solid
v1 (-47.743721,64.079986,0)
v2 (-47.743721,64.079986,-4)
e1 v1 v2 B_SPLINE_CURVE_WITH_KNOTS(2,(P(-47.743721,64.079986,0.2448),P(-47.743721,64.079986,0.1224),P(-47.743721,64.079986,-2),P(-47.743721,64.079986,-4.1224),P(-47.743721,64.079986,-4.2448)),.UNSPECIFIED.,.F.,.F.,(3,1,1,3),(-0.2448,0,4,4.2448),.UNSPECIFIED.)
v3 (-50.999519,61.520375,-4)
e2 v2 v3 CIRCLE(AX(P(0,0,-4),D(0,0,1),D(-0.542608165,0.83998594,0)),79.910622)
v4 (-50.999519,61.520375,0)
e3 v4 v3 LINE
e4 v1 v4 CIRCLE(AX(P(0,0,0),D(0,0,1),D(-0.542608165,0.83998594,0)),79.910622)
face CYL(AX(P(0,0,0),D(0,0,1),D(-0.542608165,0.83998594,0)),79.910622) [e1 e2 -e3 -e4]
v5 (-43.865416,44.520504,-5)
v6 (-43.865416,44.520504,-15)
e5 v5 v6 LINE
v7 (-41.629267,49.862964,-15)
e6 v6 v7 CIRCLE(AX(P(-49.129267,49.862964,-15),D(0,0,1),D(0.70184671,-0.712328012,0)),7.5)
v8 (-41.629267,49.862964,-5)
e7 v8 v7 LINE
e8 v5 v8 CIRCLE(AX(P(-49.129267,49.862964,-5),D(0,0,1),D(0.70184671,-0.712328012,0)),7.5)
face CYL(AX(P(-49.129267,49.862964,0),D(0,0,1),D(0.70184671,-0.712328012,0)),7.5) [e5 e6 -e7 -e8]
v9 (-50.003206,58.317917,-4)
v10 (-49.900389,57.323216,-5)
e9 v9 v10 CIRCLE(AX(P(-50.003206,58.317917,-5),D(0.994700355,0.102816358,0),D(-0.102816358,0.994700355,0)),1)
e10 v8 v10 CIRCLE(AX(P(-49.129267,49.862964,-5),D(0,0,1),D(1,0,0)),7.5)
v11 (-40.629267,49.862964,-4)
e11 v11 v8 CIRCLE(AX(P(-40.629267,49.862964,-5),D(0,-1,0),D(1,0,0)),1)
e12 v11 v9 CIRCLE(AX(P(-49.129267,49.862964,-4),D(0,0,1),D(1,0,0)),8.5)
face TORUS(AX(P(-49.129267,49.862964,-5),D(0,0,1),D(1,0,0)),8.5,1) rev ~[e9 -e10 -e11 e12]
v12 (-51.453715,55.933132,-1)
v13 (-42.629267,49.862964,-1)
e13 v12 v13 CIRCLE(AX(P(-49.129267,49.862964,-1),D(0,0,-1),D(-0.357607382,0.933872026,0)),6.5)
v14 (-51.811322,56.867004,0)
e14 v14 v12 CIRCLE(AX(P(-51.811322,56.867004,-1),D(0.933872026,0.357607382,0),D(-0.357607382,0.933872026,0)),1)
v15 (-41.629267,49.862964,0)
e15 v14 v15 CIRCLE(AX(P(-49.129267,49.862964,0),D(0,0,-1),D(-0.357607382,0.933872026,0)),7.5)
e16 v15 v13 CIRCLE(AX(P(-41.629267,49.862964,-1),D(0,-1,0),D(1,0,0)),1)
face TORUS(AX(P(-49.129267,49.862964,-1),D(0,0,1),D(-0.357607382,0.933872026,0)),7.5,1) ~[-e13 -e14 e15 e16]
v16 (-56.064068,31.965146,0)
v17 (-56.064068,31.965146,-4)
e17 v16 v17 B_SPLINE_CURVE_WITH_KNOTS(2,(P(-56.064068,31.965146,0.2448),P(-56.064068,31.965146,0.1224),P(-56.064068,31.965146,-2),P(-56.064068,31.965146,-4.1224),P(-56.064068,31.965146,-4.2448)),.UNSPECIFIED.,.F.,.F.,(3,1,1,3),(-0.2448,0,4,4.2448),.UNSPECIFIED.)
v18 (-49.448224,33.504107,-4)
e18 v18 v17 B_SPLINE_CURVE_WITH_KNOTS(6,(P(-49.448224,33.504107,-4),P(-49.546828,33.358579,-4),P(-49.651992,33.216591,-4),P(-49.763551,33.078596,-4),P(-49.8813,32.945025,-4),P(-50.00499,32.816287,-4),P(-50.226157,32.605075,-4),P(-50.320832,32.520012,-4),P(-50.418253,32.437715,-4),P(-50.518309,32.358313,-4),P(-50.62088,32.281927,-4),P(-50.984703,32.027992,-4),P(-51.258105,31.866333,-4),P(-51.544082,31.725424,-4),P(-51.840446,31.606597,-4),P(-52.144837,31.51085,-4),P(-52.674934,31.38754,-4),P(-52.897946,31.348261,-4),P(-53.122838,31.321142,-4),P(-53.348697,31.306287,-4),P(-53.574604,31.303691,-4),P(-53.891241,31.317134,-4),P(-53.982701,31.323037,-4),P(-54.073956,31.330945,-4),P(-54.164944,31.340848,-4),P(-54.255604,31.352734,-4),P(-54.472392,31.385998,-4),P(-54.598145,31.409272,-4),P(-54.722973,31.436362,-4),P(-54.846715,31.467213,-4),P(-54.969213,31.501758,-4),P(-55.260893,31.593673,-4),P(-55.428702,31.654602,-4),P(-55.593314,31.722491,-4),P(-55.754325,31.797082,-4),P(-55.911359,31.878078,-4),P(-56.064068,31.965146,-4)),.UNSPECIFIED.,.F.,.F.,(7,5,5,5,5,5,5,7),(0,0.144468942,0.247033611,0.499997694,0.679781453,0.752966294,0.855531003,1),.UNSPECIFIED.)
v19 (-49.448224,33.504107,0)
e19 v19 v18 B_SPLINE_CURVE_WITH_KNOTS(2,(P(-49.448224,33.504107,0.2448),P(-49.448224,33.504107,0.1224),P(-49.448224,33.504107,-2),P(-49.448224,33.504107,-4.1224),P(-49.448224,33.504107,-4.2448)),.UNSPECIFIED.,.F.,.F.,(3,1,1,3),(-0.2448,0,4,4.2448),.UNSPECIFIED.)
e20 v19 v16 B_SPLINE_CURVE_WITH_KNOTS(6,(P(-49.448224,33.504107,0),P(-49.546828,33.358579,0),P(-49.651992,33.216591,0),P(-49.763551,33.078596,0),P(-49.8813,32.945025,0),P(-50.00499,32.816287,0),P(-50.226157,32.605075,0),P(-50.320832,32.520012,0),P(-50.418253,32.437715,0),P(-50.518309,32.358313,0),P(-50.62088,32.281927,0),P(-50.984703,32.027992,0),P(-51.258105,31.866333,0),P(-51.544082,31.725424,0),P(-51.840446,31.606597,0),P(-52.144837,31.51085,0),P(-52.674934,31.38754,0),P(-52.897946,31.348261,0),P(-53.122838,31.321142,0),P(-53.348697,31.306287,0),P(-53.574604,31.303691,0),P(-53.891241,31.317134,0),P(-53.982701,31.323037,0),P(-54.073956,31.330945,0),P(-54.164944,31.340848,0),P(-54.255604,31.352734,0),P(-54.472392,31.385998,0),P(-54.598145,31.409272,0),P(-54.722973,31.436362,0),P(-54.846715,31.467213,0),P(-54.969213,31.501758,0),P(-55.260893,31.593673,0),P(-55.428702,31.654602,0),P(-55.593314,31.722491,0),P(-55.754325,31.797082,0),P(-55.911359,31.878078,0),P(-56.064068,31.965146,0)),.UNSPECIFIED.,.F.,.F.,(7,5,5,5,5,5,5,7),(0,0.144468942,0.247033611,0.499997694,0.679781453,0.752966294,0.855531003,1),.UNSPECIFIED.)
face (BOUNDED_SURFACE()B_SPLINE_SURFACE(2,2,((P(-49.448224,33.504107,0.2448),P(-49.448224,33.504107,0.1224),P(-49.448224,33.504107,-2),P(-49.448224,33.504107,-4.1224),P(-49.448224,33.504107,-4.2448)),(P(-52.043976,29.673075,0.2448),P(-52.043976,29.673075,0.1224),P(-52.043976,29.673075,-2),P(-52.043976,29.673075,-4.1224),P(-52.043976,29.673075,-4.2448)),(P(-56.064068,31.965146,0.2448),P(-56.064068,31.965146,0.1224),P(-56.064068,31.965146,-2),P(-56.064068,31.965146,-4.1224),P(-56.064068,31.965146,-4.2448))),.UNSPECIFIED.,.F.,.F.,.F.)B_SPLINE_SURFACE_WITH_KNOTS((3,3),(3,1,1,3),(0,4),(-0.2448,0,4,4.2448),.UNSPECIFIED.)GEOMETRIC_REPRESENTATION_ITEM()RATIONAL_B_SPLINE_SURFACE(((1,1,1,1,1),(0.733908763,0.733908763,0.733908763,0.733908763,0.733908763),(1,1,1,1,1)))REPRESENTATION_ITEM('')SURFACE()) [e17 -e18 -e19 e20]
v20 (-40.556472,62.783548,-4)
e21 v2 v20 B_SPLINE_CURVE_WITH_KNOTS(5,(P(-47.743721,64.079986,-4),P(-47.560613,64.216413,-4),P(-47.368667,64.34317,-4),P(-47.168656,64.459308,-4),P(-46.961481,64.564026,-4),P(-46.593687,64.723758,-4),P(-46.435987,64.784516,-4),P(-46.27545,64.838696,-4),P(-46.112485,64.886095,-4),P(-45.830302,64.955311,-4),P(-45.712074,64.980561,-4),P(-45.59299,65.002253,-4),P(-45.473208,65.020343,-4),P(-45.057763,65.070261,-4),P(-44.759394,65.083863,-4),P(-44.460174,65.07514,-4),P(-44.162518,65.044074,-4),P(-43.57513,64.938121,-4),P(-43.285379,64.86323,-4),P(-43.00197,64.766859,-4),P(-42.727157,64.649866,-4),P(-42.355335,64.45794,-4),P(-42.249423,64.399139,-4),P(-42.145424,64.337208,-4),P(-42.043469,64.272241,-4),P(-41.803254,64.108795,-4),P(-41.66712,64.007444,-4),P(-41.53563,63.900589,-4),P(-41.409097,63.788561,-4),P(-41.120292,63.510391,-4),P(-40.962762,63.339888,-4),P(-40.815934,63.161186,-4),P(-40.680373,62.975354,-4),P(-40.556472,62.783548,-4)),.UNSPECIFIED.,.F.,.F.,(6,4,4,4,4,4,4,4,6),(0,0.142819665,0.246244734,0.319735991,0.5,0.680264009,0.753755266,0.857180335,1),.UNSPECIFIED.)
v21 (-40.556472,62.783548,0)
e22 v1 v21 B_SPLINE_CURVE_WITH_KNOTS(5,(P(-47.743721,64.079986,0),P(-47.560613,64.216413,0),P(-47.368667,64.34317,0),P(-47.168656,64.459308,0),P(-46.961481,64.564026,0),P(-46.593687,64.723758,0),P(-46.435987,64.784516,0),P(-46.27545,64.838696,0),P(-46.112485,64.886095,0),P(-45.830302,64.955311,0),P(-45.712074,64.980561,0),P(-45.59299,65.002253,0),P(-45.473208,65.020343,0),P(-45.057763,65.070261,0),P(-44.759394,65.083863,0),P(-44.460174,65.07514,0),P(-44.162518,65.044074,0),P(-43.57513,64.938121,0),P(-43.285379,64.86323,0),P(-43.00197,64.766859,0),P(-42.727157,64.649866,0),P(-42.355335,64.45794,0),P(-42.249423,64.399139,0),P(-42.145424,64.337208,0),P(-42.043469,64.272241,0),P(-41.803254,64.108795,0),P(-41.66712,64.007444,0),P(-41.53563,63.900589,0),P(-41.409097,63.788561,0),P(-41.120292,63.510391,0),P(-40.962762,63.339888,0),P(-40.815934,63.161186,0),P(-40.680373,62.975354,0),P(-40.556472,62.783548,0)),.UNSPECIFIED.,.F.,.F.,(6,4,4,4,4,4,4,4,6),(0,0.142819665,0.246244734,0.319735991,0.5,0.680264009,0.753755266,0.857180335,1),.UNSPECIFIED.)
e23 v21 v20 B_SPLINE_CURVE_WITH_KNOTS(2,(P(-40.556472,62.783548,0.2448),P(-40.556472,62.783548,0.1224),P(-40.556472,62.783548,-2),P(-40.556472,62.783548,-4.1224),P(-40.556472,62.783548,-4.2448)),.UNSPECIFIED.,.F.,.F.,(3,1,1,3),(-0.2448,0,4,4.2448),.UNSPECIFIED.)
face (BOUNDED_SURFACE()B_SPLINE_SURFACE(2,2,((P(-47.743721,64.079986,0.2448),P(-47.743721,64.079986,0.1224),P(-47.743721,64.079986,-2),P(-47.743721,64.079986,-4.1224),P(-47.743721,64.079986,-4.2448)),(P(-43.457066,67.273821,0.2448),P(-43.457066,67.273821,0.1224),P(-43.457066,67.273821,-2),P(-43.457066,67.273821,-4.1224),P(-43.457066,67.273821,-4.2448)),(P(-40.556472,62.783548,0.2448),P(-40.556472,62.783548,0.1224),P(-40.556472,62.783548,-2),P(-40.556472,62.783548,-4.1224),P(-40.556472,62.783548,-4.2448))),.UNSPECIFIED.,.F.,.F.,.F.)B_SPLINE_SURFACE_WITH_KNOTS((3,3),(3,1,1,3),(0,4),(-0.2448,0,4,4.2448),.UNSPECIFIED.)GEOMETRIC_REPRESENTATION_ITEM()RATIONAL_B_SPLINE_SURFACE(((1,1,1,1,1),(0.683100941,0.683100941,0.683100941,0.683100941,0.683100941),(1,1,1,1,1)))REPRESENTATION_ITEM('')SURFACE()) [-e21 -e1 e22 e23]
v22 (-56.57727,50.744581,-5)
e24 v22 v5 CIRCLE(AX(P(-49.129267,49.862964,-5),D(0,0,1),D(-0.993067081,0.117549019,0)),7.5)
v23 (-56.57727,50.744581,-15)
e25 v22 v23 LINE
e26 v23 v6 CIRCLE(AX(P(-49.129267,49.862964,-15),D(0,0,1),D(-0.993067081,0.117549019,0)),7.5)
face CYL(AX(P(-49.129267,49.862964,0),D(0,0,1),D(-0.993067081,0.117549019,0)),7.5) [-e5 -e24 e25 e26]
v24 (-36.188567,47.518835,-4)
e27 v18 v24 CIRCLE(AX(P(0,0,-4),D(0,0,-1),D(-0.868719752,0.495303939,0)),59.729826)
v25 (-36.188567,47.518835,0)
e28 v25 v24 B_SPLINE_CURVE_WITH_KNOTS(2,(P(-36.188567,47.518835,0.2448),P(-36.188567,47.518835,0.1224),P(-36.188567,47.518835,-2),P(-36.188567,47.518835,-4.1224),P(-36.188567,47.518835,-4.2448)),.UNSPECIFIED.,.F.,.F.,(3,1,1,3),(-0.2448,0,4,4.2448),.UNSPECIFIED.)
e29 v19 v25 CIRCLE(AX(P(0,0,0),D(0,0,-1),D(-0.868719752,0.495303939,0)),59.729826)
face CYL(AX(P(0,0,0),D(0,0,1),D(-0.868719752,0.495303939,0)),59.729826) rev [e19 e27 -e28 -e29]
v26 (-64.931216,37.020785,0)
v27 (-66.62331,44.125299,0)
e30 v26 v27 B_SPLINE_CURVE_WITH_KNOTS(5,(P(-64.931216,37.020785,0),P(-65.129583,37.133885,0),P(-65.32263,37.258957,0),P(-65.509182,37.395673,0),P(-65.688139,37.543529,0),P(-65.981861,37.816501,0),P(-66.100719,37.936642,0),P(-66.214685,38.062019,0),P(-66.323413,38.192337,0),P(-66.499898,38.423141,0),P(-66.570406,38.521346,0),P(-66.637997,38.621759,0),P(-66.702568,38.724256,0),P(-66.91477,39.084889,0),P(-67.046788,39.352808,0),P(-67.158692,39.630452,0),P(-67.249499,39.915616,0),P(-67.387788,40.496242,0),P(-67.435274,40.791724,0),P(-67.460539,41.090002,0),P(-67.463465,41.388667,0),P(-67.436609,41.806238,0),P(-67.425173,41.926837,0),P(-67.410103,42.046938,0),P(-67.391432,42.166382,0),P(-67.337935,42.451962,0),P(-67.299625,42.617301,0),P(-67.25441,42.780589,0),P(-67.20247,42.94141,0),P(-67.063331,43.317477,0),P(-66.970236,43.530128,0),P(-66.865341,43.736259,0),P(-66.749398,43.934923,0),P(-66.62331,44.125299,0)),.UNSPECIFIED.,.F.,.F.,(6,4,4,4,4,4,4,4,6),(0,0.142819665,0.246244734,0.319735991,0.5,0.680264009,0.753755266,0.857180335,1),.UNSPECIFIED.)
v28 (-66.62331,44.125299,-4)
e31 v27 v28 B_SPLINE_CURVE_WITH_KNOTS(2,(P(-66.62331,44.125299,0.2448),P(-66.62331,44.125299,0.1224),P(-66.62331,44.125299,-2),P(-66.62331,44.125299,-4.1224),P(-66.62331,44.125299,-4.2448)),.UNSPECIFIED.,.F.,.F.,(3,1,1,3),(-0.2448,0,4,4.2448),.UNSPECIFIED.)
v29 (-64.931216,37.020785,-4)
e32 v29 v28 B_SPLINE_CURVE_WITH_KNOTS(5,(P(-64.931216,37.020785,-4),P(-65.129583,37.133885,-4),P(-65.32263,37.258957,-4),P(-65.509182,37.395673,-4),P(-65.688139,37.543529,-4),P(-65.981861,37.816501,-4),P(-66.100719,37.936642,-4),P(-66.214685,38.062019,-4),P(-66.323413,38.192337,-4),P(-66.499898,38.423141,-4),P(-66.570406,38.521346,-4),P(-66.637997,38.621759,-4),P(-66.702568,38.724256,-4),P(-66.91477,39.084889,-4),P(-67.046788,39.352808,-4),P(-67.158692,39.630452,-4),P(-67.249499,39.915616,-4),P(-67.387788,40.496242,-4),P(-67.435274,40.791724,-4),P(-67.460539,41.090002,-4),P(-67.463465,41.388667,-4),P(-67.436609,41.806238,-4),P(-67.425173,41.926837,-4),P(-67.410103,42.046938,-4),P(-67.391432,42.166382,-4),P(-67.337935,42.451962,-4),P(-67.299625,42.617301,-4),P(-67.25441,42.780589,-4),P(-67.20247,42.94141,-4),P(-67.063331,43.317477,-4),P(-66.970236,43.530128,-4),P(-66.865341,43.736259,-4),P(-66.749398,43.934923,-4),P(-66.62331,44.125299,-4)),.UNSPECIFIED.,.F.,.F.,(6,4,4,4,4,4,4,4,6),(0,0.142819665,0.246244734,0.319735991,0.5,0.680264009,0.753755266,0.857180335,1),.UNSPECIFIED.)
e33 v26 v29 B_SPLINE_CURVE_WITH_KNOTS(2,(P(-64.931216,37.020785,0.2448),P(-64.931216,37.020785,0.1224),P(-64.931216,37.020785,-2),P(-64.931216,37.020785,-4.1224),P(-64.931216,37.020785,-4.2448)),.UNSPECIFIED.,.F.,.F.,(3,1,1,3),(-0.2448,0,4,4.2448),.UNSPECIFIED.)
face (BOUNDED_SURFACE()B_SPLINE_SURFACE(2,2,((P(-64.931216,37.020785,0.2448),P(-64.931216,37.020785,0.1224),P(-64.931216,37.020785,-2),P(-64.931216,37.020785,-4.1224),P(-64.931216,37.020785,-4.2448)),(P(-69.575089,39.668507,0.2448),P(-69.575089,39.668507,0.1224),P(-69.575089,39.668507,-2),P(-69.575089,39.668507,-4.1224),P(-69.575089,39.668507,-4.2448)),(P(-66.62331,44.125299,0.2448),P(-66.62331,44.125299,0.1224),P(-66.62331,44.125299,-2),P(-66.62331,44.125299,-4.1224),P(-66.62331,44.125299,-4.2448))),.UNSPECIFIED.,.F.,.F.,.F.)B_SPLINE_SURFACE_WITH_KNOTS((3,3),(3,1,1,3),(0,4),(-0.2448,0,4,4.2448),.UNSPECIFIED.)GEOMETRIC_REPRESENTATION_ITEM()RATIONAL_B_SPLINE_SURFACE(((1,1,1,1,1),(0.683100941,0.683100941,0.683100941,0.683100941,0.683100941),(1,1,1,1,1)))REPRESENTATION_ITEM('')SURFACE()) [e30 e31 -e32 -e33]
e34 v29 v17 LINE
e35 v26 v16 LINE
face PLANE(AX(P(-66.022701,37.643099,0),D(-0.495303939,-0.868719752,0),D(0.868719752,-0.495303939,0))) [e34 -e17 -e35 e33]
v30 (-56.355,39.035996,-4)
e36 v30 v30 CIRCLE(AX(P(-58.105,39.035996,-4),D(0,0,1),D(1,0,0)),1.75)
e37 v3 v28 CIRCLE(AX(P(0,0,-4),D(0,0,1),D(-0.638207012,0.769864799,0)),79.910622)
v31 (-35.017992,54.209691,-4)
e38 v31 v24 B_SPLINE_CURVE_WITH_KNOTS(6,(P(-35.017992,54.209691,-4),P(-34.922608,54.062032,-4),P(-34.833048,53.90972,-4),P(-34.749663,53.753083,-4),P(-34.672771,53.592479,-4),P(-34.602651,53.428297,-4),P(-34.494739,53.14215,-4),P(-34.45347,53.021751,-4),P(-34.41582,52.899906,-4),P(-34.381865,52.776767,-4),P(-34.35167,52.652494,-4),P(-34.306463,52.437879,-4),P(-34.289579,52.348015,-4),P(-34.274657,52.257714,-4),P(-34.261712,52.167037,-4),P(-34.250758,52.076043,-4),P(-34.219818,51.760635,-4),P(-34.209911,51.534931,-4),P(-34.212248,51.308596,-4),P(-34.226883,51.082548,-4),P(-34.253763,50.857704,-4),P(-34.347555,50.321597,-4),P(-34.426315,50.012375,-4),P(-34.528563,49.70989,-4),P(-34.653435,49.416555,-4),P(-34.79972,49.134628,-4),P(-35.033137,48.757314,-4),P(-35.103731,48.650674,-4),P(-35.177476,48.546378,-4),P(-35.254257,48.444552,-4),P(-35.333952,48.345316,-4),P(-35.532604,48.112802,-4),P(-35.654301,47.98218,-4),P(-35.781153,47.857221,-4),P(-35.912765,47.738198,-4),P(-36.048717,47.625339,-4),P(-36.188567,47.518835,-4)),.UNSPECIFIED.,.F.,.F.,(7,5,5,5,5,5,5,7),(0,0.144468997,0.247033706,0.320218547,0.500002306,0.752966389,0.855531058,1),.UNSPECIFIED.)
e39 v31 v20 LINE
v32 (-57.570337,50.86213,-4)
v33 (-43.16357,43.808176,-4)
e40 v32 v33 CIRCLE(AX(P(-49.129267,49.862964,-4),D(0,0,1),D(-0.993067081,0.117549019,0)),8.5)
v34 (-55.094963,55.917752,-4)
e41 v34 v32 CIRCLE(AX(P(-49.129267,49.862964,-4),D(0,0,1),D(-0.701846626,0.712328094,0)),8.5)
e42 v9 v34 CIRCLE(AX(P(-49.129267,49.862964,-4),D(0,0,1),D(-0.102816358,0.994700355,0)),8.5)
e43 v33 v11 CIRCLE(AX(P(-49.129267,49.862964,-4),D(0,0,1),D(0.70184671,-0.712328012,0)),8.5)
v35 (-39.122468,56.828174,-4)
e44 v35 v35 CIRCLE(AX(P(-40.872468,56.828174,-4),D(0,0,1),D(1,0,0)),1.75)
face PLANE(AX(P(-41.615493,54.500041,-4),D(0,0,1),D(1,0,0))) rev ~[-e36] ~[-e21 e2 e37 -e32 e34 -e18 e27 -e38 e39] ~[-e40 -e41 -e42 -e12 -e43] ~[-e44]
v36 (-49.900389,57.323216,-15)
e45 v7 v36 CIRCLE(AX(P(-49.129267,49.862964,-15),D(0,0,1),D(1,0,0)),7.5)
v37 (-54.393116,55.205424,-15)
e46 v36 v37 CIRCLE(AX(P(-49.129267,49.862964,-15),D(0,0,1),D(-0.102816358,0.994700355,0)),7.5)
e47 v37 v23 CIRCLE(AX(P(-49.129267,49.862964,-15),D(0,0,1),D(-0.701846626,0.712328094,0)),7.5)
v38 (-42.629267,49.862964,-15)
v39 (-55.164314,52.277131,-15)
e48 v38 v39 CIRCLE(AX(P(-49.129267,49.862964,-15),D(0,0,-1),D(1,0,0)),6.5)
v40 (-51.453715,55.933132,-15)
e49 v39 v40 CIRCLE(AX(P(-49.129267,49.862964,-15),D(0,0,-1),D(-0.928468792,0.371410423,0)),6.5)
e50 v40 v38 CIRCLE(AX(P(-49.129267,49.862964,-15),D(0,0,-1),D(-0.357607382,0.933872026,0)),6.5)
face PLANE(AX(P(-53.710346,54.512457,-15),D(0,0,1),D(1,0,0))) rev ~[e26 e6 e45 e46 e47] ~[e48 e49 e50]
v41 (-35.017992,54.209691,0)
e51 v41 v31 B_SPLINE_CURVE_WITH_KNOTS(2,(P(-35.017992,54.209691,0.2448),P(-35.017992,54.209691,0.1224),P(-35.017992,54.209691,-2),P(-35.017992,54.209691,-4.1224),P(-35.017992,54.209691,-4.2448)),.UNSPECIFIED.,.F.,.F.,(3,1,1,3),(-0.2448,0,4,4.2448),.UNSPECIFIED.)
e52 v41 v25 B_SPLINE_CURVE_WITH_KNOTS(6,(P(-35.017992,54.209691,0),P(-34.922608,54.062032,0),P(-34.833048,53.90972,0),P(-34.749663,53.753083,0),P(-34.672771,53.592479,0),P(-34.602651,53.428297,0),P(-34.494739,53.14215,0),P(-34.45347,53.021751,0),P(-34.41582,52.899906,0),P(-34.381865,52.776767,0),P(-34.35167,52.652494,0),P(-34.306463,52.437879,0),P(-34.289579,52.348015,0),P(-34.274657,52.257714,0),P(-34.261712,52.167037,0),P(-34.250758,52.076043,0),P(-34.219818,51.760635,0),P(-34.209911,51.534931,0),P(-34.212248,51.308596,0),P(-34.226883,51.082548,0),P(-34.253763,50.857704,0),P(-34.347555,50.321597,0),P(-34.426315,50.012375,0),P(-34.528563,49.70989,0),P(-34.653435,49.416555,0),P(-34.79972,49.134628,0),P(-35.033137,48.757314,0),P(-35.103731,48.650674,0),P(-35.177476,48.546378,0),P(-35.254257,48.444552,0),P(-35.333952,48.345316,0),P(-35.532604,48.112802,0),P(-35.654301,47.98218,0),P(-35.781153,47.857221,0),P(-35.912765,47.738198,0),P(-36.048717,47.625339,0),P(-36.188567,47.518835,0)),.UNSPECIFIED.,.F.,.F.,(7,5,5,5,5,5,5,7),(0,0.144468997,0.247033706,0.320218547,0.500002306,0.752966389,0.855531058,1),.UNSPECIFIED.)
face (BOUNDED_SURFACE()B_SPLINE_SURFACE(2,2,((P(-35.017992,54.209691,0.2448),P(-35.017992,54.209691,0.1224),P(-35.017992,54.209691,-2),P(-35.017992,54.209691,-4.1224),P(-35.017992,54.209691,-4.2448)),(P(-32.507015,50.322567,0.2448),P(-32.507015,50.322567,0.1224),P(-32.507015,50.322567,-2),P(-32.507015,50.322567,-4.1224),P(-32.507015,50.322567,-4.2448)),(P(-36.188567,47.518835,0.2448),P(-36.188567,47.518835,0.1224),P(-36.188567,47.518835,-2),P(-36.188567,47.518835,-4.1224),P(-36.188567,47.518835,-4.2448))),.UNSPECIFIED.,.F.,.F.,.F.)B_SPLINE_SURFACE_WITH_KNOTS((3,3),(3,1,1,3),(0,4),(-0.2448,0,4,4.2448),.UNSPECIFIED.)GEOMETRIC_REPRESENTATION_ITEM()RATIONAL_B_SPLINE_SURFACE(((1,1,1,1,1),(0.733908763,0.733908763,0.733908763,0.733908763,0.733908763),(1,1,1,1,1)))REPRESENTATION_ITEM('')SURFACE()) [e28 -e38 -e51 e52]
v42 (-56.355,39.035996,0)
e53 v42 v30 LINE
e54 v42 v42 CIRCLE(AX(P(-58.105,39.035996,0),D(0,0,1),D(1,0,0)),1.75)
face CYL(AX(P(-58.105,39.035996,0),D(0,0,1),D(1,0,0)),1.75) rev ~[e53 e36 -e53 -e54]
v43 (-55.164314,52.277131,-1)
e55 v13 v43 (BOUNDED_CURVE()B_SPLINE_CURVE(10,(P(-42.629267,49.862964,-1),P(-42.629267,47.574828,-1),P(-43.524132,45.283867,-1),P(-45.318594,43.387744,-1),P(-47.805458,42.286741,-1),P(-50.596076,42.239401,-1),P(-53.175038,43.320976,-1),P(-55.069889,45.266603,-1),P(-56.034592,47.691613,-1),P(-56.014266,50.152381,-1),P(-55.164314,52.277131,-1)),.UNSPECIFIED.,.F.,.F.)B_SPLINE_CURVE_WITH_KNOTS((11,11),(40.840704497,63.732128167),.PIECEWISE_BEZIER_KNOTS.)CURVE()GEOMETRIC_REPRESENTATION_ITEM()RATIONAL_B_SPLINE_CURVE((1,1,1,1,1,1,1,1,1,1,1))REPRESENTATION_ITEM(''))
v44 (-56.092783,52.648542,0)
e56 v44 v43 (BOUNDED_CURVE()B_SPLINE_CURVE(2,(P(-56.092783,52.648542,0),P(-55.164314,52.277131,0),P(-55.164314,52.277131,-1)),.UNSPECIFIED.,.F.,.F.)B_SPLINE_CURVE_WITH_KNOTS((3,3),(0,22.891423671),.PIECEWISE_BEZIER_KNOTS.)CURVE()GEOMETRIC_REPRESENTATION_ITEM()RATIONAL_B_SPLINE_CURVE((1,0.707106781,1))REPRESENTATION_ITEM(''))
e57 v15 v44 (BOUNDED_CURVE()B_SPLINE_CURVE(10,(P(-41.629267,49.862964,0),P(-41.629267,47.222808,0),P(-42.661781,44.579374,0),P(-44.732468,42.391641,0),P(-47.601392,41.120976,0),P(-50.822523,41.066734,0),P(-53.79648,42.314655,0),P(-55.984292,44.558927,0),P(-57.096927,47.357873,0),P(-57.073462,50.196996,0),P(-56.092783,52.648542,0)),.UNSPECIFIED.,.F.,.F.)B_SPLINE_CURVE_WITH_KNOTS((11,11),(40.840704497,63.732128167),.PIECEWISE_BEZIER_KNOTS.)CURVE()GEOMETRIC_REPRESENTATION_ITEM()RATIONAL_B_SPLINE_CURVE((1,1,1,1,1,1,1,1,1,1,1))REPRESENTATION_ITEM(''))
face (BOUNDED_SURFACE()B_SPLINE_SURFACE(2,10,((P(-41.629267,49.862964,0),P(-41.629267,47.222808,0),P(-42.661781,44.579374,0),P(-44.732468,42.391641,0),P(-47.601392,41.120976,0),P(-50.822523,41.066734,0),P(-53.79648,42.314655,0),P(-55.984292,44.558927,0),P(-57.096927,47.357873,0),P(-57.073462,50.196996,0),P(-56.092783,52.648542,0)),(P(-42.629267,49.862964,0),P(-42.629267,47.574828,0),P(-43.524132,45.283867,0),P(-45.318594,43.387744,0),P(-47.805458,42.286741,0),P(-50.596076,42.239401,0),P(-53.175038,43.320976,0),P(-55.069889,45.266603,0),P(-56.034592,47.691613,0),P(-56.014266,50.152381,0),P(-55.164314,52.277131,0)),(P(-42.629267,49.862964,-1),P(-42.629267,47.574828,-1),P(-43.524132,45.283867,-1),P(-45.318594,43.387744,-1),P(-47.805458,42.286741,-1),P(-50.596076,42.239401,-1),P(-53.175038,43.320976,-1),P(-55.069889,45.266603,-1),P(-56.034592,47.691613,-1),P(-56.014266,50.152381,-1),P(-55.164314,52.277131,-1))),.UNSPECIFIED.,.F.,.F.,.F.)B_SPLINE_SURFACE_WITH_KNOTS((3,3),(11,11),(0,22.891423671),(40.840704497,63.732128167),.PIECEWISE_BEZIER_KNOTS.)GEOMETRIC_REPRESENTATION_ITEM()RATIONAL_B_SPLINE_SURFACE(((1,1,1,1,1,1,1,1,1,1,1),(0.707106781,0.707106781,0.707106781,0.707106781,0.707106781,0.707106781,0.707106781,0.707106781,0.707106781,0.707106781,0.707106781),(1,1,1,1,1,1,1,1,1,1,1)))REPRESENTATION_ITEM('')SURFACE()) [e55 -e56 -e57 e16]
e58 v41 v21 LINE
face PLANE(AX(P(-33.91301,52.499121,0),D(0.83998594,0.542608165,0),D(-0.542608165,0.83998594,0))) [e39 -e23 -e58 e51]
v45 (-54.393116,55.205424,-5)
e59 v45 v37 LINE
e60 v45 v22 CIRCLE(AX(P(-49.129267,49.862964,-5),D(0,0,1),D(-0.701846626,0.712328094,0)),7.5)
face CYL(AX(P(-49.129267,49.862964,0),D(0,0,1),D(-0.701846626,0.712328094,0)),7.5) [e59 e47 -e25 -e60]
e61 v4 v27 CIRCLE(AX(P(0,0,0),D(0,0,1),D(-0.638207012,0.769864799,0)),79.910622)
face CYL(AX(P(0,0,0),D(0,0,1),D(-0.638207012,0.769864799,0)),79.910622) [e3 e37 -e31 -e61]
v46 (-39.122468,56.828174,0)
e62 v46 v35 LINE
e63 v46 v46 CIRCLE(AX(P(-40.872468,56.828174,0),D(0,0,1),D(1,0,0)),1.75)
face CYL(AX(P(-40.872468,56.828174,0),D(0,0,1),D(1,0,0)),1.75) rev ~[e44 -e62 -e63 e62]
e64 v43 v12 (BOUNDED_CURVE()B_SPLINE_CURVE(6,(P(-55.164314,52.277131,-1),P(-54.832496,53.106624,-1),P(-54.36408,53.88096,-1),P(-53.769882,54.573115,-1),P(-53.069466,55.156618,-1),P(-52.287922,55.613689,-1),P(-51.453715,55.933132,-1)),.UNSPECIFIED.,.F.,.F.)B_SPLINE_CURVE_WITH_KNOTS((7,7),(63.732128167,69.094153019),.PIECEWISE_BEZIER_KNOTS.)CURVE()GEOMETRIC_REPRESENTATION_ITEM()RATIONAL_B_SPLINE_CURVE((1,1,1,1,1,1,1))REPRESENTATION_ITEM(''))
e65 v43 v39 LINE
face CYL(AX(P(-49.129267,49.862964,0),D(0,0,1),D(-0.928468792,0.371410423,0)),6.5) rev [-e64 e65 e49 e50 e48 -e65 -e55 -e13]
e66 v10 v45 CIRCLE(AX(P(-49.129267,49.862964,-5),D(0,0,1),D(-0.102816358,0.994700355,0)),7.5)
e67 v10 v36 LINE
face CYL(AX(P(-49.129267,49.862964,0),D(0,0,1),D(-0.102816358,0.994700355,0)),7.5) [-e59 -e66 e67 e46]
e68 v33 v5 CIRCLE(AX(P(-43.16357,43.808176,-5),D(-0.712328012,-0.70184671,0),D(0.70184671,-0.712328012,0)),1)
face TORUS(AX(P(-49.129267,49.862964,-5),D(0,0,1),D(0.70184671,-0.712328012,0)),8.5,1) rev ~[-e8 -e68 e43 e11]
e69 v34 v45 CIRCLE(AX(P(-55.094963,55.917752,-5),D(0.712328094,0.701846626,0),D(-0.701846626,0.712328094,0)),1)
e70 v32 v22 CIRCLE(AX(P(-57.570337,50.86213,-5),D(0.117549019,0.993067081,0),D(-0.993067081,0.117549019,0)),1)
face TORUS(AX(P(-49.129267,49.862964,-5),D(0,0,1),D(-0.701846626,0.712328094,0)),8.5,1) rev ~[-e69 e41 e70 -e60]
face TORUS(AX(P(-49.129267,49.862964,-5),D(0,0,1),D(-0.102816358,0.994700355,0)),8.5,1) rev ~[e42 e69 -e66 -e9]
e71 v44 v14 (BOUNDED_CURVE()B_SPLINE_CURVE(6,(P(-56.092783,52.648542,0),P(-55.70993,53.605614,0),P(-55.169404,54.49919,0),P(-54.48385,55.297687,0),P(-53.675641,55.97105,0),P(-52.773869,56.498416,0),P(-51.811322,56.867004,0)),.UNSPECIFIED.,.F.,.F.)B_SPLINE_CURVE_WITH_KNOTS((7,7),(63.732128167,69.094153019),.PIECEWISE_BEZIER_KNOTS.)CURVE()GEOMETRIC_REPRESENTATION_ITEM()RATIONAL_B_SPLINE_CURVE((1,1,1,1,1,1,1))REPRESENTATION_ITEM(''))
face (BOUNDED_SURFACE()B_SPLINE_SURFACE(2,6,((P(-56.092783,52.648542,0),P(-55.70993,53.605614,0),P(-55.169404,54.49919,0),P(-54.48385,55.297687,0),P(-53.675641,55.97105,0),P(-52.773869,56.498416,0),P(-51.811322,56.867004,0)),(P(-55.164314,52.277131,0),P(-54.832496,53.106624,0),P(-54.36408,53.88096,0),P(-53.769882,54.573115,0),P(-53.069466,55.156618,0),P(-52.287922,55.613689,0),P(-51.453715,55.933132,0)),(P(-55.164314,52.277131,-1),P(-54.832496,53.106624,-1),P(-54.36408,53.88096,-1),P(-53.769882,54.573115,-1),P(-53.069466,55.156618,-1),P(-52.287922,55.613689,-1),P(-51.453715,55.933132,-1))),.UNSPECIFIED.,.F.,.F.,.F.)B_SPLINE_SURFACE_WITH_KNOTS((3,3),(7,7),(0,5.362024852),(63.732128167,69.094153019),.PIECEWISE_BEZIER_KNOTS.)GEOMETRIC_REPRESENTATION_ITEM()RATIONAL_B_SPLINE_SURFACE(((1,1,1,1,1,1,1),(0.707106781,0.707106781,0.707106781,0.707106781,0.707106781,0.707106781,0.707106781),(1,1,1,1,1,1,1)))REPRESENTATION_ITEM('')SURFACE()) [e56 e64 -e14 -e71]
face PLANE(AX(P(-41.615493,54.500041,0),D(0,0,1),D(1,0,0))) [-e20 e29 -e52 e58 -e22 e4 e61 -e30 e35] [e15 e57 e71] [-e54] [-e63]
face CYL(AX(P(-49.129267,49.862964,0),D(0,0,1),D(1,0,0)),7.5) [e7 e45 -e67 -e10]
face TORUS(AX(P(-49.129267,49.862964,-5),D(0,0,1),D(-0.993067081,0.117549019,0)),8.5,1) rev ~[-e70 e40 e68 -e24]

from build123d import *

# Parameters (mm, degrees)
F0_R     = 1.75
F1_DEPTH = 4
F2_DEPTH = 15
F3_R     = 5
F4_R     = 1


# Not quite as in the source:
# - a feature names something its author has since deleted; it is built from what else it names


with BuildPart() as f1:
    # F0 (on Top) → F1 (new body)
    with BuildSketch(Plane.XY):
        with BuildLine():
            Line((-33.9130103109, 52.4991212465), (-41.2382205381, 63.8389314357))
            ThreePointArc((-41.2382205381, 63.8389314357), (-44.9500240756, 61.2820963709), (-48.5037329382, 58.5097247563))
            ThreePointArc((-48.5037329382, 58.5097247563), (-49.20563764, 57.9206804556), (-49.9003894351, 57.3232163633))
            ThreePointArc((-49.9003894351, 57.3232163633), (-44.1059919264, 55.4322284704), (-41.6292667465, 49.8629637))
            ThreePointArc((-41.6292667465, 49.8629637), (-42.2108537269, 46.9671803363), (-43.8654164238, 44.5205036131))
            ThreePointArc((-43.8654164238, 44.5205036131), (-39.0932922784, 48.7643773551), (-33.9130103109, 52.4991212465))
        make_face()
        with Locations((-40.8724684836, 56.828173647)):
            Circle(F0_R, mode=Mode.SUBTRACT)
        with BuildLine():
            ThreePointArc((-49.4610434567, 59.6645219554), (-51.9749220296, 57.4878898553), (-54.3931164452, 55.2054244018))
            ThreePointArc((-54.3931164452, 55.2054244018), (-52.3271541158, 56.6470271117), (-49.9003894351, 57.3232163633))
            ThreePointArc((-49.9003894351, 57.3232163633), (-49.20563764, 57.9206804556), (-48.5037329382, 58.5097247563))
            Line((-48.5037329382, 58.5097247563), (-49.4610434568, 59.6645219554))
        make_face()
        with BuildLine():
            Line((-69.4199358602, 39.5800459158), (-67.3257807989, 38.3860552782))
            ThreePointArc((-67.3257807989, 38.3860552782), (-61.4377349925, 47.2403928751), (-54.3931164452, 55.2054244018))
            ThreePointArc((-54.3931164452, 55.2054244018), (-51.9749220296, 57.4878898553), (-49.4610434567, 59.6645219554))
            Line((-49.4610434568, 59.6645219554), (-50.9995194055, 61.5203750796))
            ThreePointArc((-50.9995194055, 61.5203750796), (-61.2009461738, 51.382406687), (-69.4199358602, 39.5800459158))
        make_face()
        with BuildLine():
            ThreePointArc((-49.4610434567, 59.6645219554), (-45.8371956034, 62.4916114308), (-42.0521327855, 65.0989103456))
            Line((-42.0521327855, 65.0989103456), (-43.360156037, 67.123799043))
            ThreePointArc((-43.360156037, 67.123799043), (-47.2629524833, 64.4354006125), (-50.9995194055, 61.5203750796))
            Line((-50.9995194055, 61.5203750796), (-49.4610434568, 59.6645219554))
        make_face()
        with BuildLine():
            Line((-41.2382205381, 63.8389314357), (-42.0521327855, 65.0989103456))
            ThreePointArc((-42.0521327855, 65.0989103456), (-45.8371956034, 62.4916114308), (-49.4610434567, 59.6645219554))
            Line((-49.4610434568, 59.6645219554), (-48.5037329382, 58.5097247563))
            ThreePointArc((-48.5037329382, 58.5097247563), (-44.9500240756, 61.2820963709), (-41.2382205381, 63.8389314357))
        make_face()
        with BuildLine():
            ThreePointArc((-54.3931164452, 55.2054244018), (-61.4377349925, 47.2403928751), (-67.3257807989, 38.3860552782))
            Line((-67.3257807989, 38.3860552782), (-66.0227011705, 37.6430993696))
            ThreePointArc((-66.0227011705, 37.6430993696), (-61.6490099795, 44.4454673566), (-56.577269857, 50.7445813415))
            ThreePointArc((-56.577269857, 50.7445813415), (-55.8651839567, 53.1610569882), (-54.3931164452, 55.2054244018))
        make_face()
        with BuildLine():
            ThreePointArc((-49.9003894351, 57.3232163633), (-52.3271541158, 56.6470271117), (-54.3931164452, 55.2054244018))
            ThreePointArc((-54.3931164452, 55.2054244018), (-55.8651839567, 53.1610569882), (-56.577269857, 50.7445813415))
            ThreePointArc((-56.577269857, 50.7445813415), (-55.8760464089, 51.5157008854), (-55.1643138946, 52.277131449))
            ThreePointArc((-55.1643138946, 52.277131449), (-53.6912700872, 54.4930960436), (-51.453714731, 55.9331318663))
            ThreePointArc((-51.453714731, 55.9331318663), (-50.6818181556, 56.6334998781), (-49.9003894351, 57.3232163633))
        make_face()
        with BuildLine():
            ThreePointArc((-41.6292667465, 49.8629637), (-44.1059919264, 55.4322284704), (-49.9003894351, 57.3232163633))
            ThreePointArc((-49.9003894351, 57.3232163633), (-50.6818181556, 56.6334998781), (-51.453714731, 55.9331318663))
            ThreePointArc((-51.453714731, 55.9331318663), (-45.4454448113, 55.2182840406), (-42.6292667465, 49.8629637))
            ThreePointArc((-42.6292667465, 49.8629637), (-50.3585335071, 43.4802602578), (-55.1643138946, 52.277131449))
            ThreePointArc((-55.1643138946, 52.277131449), (-55.8760464089, 51.5157008854), (-56.577269857, 50.7445813415))
            ThreePointArc((-56.577269857, 50.7445813415), (-52.4273596413, 43.1270462972), (-43.8654164238, 44.5205036131))
            ThreePointArc((-43.8654164238, 44.5205036131), (-42.2108537269, 46.9671803363), (-41.6292667465, 49.8629637))
        make_face()
        with BuildLine():
            ThreePointArc((-56.577269857, 50.7445813415), (-61.6490099795, 44.4454673566), (-66.0227011705, 37.6430993696))
            Line((-66.0227011705, 37.6430993696), (-54.2949845152, 30.9564961921))
            ThreePointArc((-54.2949845152, 30.9564961921), (-49.5465604503, 38.0970910641), (-43.8654164238, 44.5205036131))
            ThreePointArc((-43.8654164238, 44.5205036131), (-52.4273596413, 43.1270462972), (-56.577269857, 50.7445813415))
        make_face()
        with Locations((-58.1049998349, 39.0359961341)):
            Circle(F0_R, mode=Mode.SUBTRACT)
        with BuildLine():
            ThreePointArc((-43.8654164238, 44.5205036131), (-49.5465604503, 38.0970910641), (-54.2949845152, 30.9564961921))
            Line((-54.2949845152, 30.9564961921), (-51.8884792508, 29.5844178737))
            ThreePointArc((-51.8884792508, 29.5844178737), (-43.387995367, 41.0503826769), (-32.4098910344, 50.1722136548))
            Line((-32.4098910344, 50.1722136548), (-33.9130103109, 52.4991212465))
            ThreePointArc((-33.9130103109, 52.4991212465), (-39.0932922784, 48.7643773551), (-43.8654164238, 44.5205036131))
        make_face()
    extrude(amount=-F1_DEPTH)

    # F0 (on Top) → F2 (join)
    with BuildSketch(Plane.XY):
        with BuildLine():
            ThreePointArc((-49.9003894351, 57.3232163633), (-52.3271541158, 56.6470271117), (-54.3931164452, 55.2054244018))
            ThreePointArc((-54.3931164452, 55.2054244018), (-55.8651839567, 53.1610569882), (-56.577269857, 50.7445813415))
            ThreePointArc((-56.577269857, 50.7445813415), (-55.8760464089, 51.5157008854), (-55.1643138946, 52.277131449))
            ThreePointArc((-55.1643138946, 52.277131449), (-53.6912700872, 54.4930960436), (-51.453714731, 55.9331318663))
            ThreePointArc((-51.453714731, 55.9331318663), (-50.6818181556, 56.6334998781), (-49.9003894351, 57.3232163633))
        make_face()
        with BuildLine():
            ThreePointArc((-41.6292667465, 49.8629637), (-44.1059919264, 55.4322284704), (-49.9003894351, 57.3232163633))
            ThreePointArc((-49.9003894351, 57.3232163633), (-50.6818181556, 56.6334998781), (-51.453714731, 55.9331318663))
            ThreePointArc((-51.453714731, 55.9331318663), (-45.4454448113, 55.2182840406), (-42.6292667465, 49.8629637))
            ThreePointArc((-42.6292667465, 49.8629637), (-50.3585335071, 43.4802602578), (-55.1643138946, 52.277131449))
            ThreePointArc((-55.1643138946, 52.277131449), (-55.8760464089, 51.5157008854), (-56.577269857, 50.7445813415))
            ThreePointArc((-56.577269857, 50.7445813415), (-52.4273596413, 43.1270462972), (-43.8654164238, 44.5205036131))
            ThreePointArc((-43.8654164238, 44.5205036131), (-42.2108537269, 46.9671803363), (-41.6292667465, 49.8629637))
        make_face()
    extrude(amount=-F2_DEPTH)

    # F3
    f3_edges = [f1.edges().sort_by_distance(p)[0] for p in [
        (-43.360156, 67.123799, -2),
        (-32.409891, 50.172214, -2),
        (-69.419936, 39.580046, -2),
        (-51.888479, 29.584418, -2),
    ]]
    fillet(f3_edges, radius=F3_R)

    # F4
    f4_edges = [f1.edges().sort_by_distance(p)[0] for p in [
        (-43.865417, 44.520503, -4),
        (-46.804819, 43.792796, 0),
    ]]
    fillet(f4_edges, radius=F4_R)


solid = f1.part
